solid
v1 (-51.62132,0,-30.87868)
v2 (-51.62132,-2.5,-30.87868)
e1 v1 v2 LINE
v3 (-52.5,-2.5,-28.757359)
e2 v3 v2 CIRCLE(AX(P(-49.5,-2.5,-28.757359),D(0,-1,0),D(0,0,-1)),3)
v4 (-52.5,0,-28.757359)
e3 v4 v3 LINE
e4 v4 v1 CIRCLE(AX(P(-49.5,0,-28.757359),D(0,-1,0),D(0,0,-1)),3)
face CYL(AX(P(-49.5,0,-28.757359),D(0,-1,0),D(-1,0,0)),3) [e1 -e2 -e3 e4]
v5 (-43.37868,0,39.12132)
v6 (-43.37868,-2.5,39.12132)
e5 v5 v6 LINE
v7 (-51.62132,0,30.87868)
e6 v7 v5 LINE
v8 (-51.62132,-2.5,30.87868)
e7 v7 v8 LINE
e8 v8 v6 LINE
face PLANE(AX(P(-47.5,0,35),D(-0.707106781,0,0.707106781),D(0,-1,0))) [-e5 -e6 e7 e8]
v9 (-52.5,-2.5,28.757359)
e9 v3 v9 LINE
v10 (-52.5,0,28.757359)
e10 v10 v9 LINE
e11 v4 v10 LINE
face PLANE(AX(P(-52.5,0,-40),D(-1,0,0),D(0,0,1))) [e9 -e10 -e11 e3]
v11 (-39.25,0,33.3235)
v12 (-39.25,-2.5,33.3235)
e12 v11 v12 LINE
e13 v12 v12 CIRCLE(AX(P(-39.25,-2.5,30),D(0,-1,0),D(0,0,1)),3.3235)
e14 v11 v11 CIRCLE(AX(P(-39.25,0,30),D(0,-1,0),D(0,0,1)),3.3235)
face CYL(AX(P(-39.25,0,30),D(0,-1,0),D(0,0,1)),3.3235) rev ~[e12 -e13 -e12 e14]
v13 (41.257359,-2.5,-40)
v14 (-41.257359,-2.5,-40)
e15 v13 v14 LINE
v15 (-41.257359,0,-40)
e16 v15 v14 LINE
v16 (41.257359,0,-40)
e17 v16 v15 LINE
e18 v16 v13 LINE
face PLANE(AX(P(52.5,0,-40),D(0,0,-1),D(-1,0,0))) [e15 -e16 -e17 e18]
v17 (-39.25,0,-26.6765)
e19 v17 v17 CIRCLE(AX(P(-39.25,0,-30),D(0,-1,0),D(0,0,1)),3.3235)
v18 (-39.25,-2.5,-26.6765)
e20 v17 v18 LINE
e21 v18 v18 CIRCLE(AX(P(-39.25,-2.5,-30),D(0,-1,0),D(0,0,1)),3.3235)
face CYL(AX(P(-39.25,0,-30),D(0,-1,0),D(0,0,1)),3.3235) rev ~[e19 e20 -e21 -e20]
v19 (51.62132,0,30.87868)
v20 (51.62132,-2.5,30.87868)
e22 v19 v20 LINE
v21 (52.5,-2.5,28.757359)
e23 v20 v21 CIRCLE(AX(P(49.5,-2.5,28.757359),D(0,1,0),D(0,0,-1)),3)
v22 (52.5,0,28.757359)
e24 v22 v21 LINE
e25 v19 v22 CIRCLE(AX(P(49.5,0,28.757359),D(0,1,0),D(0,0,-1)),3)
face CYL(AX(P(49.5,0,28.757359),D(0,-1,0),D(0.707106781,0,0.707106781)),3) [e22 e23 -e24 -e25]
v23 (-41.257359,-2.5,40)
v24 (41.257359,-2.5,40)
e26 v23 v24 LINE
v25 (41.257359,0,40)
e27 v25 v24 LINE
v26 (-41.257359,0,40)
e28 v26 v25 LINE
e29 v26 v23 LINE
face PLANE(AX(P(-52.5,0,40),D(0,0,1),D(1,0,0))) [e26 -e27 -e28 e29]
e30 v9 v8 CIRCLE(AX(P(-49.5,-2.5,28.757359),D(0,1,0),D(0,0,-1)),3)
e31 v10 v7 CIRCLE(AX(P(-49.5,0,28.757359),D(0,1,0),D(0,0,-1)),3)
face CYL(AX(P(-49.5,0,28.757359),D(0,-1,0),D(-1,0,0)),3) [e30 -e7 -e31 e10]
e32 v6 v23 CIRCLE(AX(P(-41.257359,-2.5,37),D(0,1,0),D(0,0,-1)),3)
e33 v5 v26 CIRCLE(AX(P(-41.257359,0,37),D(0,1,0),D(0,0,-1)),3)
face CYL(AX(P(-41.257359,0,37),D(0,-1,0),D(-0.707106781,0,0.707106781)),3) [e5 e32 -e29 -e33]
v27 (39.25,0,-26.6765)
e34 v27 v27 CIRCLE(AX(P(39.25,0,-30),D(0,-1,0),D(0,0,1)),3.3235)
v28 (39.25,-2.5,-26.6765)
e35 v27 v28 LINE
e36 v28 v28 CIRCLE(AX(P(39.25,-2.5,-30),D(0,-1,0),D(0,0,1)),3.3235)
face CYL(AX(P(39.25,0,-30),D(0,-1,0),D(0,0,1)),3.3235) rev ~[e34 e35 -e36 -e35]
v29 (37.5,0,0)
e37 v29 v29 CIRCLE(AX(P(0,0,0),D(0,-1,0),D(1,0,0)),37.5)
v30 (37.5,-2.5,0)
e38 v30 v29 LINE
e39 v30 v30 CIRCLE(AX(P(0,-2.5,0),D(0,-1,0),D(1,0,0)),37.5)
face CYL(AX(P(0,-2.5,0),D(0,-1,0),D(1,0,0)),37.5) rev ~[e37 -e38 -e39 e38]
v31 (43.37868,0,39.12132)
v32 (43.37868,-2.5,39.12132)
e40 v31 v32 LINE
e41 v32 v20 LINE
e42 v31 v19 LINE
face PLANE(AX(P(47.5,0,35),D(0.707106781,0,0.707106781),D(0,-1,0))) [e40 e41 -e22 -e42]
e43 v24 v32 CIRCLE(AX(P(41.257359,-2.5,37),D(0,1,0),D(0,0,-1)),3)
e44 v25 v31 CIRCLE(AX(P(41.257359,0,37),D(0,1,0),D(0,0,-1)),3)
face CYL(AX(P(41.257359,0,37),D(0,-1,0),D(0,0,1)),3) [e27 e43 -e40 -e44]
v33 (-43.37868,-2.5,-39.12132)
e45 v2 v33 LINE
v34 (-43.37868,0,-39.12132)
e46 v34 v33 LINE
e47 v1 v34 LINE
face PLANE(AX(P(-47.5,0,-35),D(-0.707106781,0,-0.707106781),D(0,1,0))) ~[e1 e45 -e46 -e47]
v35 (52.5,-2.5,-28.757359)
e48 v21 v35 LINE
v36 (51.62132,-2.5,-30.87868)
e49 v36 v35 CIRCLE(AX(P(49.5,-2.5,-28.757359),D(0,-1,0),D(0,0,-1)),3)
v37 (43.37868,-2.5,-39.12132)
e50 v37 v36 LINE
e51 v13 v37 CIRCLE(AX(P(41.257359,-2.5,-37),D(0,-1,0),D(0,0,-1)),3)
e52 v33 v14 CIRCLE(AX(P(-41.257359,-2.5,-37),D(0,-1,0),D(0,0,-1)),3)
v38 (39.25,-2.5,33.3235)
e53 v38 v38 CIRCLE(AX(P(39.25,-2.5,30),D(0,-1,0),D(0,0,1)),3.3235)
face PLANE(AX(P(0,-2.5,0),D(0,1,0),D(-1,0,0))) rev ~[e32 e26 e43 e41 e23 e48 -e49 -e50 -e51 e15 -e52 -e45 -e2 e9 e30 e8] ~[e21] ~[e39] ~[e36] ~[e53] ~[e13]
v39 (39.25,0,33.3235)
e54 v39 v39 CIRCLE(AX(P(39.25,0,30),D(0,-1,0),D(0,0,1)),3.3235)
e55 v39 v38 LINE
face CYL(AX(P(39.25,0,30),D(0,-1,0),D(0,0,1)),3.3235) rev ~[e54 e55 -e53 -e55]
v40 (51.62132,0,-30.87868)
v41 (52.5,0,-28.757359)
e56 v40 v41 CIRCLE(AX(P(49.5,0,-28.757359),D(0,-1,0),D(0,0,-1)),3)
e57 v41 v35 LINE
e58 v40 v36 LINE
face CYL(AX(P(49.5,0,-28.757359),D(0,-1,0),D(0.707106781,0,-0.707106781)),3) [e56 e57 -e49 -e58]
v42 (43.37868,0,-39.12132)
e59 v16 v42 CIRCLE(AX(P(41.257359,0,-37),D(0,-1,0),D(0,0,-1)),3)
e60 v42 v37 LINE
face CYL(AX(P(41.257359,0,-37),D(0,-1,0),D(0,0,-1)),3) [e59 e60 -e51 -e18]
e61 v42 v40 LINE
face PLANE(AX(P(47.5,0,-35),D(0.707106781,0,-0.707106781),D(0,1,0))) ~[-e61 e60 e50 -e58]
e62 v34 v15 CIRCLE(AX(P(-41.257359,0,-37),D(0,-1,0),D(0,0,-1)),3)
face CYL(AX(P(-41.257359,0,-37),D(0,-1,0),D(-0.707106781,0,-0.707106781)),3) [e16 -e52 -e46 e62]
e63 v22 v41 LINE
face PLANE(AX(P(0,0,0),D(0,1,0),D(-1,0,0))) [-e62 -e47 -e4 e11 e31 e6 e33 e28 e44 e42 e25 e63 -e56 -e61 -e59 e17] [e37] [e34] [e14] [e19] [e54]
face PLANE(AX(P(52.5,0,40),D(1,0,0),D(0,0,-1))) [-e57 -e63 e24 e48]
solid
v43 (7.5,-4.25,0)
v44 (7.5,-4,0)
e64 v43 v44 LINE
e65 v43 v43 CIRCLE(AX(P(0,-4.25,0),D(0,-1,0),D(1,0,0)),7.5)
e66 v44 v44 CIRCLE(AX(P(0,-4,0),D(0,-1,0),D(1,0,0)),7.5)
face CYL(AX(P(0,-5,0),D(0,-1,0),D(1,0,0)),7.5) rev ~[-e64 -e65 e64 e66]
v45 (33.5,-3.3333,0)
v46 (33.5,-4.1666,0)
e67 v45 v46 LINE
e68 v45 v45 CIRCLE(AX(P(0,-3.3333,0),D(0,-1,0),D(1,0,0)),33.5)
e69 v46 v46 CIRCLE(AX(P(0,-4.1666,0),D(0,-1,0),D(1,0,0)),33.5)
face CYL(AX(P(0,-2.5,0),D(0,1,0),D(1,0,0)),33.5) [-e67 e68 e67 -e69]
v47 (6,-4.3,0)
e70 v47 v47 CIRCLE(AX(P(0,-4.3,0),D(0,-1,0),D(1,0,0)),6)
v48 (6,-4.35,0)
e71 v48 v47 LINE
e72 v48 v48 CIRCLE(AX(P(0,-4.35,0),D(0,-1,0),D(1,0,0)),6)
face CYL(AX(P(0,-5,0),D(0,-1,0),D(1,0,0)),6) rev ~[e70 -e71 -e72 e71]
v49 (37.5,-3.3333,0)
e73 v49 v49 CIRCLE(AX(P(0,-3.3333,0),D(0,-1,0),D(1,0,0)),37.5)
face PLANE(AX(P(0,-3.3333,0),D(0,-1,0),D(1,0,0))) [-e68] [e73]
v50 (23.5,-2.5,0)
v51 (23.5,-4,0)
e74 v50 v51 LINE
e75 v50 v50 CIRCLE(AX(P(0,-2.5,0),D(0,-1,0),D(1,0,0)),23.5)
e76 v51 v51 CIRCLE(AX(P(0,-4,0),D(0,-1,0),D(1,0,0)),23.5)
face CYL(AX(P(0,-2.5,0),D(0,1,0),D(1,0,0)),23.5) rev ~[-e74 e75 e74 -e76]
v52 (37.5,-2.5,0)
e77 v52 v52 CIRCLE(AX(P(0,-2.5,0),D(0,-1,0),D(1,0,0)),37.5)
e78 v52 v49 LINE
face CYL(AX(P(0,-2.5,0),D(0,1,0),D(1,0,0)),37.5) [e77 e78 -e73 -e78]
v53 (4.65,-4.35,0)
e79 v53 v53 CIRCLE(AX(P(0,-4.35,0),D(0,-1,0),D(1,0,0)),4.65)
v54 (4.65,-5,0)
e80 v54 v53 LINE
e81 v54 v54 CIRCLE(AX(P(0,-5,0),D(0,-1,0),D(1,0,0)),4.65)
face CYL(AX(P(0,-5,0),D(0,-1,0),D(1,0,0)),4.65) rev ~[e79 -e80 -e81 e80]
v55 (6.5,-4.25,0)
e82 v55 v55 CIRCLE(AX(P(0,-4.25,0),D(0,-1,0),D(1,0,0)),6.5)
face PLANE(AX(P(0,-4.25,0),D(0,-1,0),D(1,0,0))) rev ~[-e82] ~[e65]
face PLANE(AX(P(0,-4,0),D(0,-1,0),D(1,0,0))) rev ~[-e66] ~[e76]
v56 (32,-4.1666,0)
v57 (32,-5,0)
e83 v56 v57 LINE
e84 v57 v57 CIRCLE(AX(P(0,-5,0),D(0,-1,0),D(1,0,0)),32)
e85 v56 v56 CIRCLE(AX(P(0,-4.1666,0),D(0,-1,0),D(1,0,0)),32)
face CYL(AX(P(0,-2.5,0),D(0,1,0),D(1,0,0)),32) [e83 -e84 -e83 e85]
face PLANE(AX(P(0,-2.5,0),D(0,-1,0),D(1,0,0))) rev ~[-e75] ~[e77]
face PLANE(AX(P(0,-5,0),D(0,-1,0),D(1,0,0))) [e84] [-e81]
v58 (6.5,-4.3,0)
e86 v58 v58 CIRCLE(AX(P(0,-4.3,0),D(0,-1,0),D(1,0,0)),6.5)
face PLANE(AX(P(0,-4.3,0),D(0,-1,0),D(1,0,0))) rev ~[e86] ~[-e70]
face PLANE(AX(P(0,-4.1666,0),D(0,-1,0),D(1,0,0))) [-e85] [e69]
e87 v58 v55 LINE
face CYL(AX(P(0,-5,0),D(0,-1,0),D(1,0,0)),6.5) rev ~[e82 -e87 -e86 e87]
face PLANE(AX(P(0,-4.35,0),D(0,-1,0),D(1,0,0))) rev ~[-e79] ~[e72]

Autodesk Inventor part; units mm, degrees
ref_plane "YZ Plane" through (0, 0, 0) normal (1, 0, 0) x (0, 1, 0)
ref_plane "XZ Plane" through (0, 0, 0) normal (0, 1, 0) x (-1, 0, 0)
ref_plane "XY Plane" through (0, 0, 0) normal (0, 0, 1) x (1, 0, 0)
sketch "Skizze1" plane through (0, 0, 0) normal (0, 1, 0) x (-1, 0, 0)
  line L0 (52.5, 40) -> (-52.5, 40)
  line L1 (-52.5, 40) -> (-52.5, -40)
  line L2 (-52.5, -40) -> (52.5, -40)
  line L3 (52.5, -40) -> (52.5, 40)
  line L4 (0, -56) -> (0, 56) construction
  line L5 (73.5, 0) -> (-73.5, 0) construction
  point P0 (0, 0)
  point P1 (-39.25, -30)
  point P2 (-39.25, 30)
  point P3 (39.25, -30)
  point P4 (39.25, 30)
  dimension "d0" = 105
  dimension "d1" = 80
  dimension "d2" = 39.25
  dimension "d3" = 30
extrude "Extrusion1" add sketch "Skizze1" against normal blind 2.5
hole "Bohrung1" at (39.25, 0, -30) at (39.25, 0, 30) at (-39.25, 0, 30) at (-39.25, 0, -30) direction (0, -1, 0) diameter 6.647 depth 14 tip angle 118 thread size "M8x1.25" class "6H" standard "ISO Metric profile"
chamfer "Fasen1" distance 10 angle 45 4 edges at (52.5, -1.25, 40) (52.5, -1.25, -40) (-52.5, -1.25, -40) (-52.5, -1.25, 40)
fillet "Rundung1" radius 3 8 edges at (-42.5, -1.25, 40) (-52.5, -1.25, 30) (-52.5, -1.25, -30) (-42.5, -1.25, -40) (42.5, -1.25, -40) (52.5, -1.25, -30) (42.5, -1.25, 40) (52.5, -1.25, 30)
sketch "Skizze2" plane through (0, -2.5, 0) normal (0, -1, 0) x (1, 0, 0)
  circle A0 centre (0, 0) radius 37.5
  circle A1 centre (0, 0) radius 34
  circle A2 centre (0, 0) radius 33.5
  circle A3 centre (0, 0) radius 32
  circle A4 centre (0, 0) radius 25
  circle A5 centre (0, 0) radius 23.5
  circle A6 centre (0, 0) radius 7.5
  circle A7 centre (0, 0) radius 6.5
  circle A8 centre (0, 0) radius 6
  circle A9 centre (0, 0) radius 4.5
  dimension "d17" = 75
  dimension "d18" = 68
  dimension "d19" = 67
  dimension "d20" = 64
  dimension "d21" = 50
  dimension "d22" = 47
  dimension "d23" = 15
  dimension "d24" = 13
  dimension "d25" = 12
  dimension "d26" = 9
extrude "Extrusion2" cut sketch "Skizze2" against normal blind 2.5 contours A0 | A1 | A2 | A3 | A4 | A5 | A6 | A7 | A8 | A9
extrude "Extrusion3" add sketch "Skizze2" along normal blind 0.8333 contours A0 | A1
extrude "Extrusion5" add sketch "Skizze2" along normal blind 1.6666 contours A2
extrude "Extrusion6" add sketch "Skizze2" along normal blind 2.5 contours A3 | A4
sketch "Skizze3" plane through (0, -5, 0) normal (0, -1, 0) x (1, 0, 0)
  circle A0 centre (0, 0) radius 23.5 construction
  circle A1 centre (0, 0) radius 4.5
  circle A2 centre (0, 0) radius 6
  circle A3 centre (0, 0) radius 6.5
  circle A4 centre (0, 0) radius 7.5
  circle A5 centre (0, 0) radius 23.5
  circle A6 centre (0, 0) radius 32 construction
  circle A7 centre (0, 0) radius 4.65
  dimension "d37" = 9
  dimension "d38" = 12
  dimension "d39" = 13
  dimension "d40" = 15
  dimension "d47" = 9.3
extrude "Extrusion7" add sketch "Skizze3" against normal blind 1 contours A5
extrude "Extrusion8" add sketch "Skizze3" against normal blind 0.75 contours A4
extrude "Extrusion9" add sketch "Skizze3" against normal blind 0.7 contours A3
extrude "Extrusion10" add sketch "Skizze3" against normal blind 0.65 contours A2
sketch "Skizze4" plane through (-52.5, 0, -28.7574) normal (-1, 0, 0) x (0, 0, 1)
  line L0 (0, -2.5) -> (0, 0) construction
  line L1 (57.5147, -2.5) -> (0, -2.5) construction
  line L2 (57.5147, 0) -> (57.5147, -2.5) construction
  line L3 (0, 0) -> (57.5147, 0) construction
  line L4 (-3.2426, -5) -> (60.7574, -5) construction
  point P0 (28.7574, 0)
  dimension "d53" = 2.5
  dimension "d54" = 5
sketch "Skizze5" plane through (0, 0, 0) normal (0, 1, 0) x (1, 0, 0)
  circle A0 centre (0, 0) radius 37.5 construction
  arc A1 (51.6213, -30.8787) -> (52.5, -28.7574) centre (49.5, -28.7574) ccw construction
  line L0 (52.5, -28.7574) -> (52.5, 28.7574) construction
  arc A2 (52.5, 28.7574) -> (51.6213, 30.8787) centre (49.5, 28.7574) ccw construction
  line L1 (43.3787, 39.1213) -> (51.6213, 30.8787) construction
  arc A3 (43.3787, 39.1213) -> (41.2574, 40) centre (41.2574, 37) ccw construction
  line L2 (41.2574, 40) -> (-41.2574, 40) construction
  arc A4 (-41.2574, 40) -> (-43.3787, 39.1213) centre (-41.2574, 37) ccw construction
  line L3 (-51.6213, 30.8787) -> (-43.3787, 39.1213) construction
  arc A5 (-51.6213, 30.8787) -> (-52.5, 28.7574) centre (-49.5, 28.7574) ccw construction
  line L4 (-52.5, 28.7574) -> (-52.5, -28.7574) construction
  arc A6 (-52.5, -28.7574) -> (-51.6213, -30.8787) centre (-49.5, -28.7574) ccw construction
  line L5 (-43.3787, -39.1213) -> (-51.6213, -30.8787) construction
  arc A7 (-43.3787, -39.1213) -> (-41.2574, -40) centre (-41.2574, -37) ccw construction
  line L6 (-41.2574, -40) -> (41.2574, -40) construction
  arc A8 (41.2574, -40) -> (43.3787, -39.1213) centre (41.2574, -37) ccw construction
  line L7 (51.6213, -30.8787) -> (43.3787, -39.1213) construction
  circle A9 centre (39.25, 30) radius 3.3235 construction
  circle A10 centre (39.25, -30) radius 3.3235 construction
  circle A11 centre (-39.25, -30) radius 3.3235 construction
  circle A12 centre (-39.25, 30) radius 3.3235 construction
  line L8 (39.25, -30) -> (0, -30)
  line L9 (0, -30) -> (0, 0)
properties part number "oberer_Rotierkörper_Rolle"
